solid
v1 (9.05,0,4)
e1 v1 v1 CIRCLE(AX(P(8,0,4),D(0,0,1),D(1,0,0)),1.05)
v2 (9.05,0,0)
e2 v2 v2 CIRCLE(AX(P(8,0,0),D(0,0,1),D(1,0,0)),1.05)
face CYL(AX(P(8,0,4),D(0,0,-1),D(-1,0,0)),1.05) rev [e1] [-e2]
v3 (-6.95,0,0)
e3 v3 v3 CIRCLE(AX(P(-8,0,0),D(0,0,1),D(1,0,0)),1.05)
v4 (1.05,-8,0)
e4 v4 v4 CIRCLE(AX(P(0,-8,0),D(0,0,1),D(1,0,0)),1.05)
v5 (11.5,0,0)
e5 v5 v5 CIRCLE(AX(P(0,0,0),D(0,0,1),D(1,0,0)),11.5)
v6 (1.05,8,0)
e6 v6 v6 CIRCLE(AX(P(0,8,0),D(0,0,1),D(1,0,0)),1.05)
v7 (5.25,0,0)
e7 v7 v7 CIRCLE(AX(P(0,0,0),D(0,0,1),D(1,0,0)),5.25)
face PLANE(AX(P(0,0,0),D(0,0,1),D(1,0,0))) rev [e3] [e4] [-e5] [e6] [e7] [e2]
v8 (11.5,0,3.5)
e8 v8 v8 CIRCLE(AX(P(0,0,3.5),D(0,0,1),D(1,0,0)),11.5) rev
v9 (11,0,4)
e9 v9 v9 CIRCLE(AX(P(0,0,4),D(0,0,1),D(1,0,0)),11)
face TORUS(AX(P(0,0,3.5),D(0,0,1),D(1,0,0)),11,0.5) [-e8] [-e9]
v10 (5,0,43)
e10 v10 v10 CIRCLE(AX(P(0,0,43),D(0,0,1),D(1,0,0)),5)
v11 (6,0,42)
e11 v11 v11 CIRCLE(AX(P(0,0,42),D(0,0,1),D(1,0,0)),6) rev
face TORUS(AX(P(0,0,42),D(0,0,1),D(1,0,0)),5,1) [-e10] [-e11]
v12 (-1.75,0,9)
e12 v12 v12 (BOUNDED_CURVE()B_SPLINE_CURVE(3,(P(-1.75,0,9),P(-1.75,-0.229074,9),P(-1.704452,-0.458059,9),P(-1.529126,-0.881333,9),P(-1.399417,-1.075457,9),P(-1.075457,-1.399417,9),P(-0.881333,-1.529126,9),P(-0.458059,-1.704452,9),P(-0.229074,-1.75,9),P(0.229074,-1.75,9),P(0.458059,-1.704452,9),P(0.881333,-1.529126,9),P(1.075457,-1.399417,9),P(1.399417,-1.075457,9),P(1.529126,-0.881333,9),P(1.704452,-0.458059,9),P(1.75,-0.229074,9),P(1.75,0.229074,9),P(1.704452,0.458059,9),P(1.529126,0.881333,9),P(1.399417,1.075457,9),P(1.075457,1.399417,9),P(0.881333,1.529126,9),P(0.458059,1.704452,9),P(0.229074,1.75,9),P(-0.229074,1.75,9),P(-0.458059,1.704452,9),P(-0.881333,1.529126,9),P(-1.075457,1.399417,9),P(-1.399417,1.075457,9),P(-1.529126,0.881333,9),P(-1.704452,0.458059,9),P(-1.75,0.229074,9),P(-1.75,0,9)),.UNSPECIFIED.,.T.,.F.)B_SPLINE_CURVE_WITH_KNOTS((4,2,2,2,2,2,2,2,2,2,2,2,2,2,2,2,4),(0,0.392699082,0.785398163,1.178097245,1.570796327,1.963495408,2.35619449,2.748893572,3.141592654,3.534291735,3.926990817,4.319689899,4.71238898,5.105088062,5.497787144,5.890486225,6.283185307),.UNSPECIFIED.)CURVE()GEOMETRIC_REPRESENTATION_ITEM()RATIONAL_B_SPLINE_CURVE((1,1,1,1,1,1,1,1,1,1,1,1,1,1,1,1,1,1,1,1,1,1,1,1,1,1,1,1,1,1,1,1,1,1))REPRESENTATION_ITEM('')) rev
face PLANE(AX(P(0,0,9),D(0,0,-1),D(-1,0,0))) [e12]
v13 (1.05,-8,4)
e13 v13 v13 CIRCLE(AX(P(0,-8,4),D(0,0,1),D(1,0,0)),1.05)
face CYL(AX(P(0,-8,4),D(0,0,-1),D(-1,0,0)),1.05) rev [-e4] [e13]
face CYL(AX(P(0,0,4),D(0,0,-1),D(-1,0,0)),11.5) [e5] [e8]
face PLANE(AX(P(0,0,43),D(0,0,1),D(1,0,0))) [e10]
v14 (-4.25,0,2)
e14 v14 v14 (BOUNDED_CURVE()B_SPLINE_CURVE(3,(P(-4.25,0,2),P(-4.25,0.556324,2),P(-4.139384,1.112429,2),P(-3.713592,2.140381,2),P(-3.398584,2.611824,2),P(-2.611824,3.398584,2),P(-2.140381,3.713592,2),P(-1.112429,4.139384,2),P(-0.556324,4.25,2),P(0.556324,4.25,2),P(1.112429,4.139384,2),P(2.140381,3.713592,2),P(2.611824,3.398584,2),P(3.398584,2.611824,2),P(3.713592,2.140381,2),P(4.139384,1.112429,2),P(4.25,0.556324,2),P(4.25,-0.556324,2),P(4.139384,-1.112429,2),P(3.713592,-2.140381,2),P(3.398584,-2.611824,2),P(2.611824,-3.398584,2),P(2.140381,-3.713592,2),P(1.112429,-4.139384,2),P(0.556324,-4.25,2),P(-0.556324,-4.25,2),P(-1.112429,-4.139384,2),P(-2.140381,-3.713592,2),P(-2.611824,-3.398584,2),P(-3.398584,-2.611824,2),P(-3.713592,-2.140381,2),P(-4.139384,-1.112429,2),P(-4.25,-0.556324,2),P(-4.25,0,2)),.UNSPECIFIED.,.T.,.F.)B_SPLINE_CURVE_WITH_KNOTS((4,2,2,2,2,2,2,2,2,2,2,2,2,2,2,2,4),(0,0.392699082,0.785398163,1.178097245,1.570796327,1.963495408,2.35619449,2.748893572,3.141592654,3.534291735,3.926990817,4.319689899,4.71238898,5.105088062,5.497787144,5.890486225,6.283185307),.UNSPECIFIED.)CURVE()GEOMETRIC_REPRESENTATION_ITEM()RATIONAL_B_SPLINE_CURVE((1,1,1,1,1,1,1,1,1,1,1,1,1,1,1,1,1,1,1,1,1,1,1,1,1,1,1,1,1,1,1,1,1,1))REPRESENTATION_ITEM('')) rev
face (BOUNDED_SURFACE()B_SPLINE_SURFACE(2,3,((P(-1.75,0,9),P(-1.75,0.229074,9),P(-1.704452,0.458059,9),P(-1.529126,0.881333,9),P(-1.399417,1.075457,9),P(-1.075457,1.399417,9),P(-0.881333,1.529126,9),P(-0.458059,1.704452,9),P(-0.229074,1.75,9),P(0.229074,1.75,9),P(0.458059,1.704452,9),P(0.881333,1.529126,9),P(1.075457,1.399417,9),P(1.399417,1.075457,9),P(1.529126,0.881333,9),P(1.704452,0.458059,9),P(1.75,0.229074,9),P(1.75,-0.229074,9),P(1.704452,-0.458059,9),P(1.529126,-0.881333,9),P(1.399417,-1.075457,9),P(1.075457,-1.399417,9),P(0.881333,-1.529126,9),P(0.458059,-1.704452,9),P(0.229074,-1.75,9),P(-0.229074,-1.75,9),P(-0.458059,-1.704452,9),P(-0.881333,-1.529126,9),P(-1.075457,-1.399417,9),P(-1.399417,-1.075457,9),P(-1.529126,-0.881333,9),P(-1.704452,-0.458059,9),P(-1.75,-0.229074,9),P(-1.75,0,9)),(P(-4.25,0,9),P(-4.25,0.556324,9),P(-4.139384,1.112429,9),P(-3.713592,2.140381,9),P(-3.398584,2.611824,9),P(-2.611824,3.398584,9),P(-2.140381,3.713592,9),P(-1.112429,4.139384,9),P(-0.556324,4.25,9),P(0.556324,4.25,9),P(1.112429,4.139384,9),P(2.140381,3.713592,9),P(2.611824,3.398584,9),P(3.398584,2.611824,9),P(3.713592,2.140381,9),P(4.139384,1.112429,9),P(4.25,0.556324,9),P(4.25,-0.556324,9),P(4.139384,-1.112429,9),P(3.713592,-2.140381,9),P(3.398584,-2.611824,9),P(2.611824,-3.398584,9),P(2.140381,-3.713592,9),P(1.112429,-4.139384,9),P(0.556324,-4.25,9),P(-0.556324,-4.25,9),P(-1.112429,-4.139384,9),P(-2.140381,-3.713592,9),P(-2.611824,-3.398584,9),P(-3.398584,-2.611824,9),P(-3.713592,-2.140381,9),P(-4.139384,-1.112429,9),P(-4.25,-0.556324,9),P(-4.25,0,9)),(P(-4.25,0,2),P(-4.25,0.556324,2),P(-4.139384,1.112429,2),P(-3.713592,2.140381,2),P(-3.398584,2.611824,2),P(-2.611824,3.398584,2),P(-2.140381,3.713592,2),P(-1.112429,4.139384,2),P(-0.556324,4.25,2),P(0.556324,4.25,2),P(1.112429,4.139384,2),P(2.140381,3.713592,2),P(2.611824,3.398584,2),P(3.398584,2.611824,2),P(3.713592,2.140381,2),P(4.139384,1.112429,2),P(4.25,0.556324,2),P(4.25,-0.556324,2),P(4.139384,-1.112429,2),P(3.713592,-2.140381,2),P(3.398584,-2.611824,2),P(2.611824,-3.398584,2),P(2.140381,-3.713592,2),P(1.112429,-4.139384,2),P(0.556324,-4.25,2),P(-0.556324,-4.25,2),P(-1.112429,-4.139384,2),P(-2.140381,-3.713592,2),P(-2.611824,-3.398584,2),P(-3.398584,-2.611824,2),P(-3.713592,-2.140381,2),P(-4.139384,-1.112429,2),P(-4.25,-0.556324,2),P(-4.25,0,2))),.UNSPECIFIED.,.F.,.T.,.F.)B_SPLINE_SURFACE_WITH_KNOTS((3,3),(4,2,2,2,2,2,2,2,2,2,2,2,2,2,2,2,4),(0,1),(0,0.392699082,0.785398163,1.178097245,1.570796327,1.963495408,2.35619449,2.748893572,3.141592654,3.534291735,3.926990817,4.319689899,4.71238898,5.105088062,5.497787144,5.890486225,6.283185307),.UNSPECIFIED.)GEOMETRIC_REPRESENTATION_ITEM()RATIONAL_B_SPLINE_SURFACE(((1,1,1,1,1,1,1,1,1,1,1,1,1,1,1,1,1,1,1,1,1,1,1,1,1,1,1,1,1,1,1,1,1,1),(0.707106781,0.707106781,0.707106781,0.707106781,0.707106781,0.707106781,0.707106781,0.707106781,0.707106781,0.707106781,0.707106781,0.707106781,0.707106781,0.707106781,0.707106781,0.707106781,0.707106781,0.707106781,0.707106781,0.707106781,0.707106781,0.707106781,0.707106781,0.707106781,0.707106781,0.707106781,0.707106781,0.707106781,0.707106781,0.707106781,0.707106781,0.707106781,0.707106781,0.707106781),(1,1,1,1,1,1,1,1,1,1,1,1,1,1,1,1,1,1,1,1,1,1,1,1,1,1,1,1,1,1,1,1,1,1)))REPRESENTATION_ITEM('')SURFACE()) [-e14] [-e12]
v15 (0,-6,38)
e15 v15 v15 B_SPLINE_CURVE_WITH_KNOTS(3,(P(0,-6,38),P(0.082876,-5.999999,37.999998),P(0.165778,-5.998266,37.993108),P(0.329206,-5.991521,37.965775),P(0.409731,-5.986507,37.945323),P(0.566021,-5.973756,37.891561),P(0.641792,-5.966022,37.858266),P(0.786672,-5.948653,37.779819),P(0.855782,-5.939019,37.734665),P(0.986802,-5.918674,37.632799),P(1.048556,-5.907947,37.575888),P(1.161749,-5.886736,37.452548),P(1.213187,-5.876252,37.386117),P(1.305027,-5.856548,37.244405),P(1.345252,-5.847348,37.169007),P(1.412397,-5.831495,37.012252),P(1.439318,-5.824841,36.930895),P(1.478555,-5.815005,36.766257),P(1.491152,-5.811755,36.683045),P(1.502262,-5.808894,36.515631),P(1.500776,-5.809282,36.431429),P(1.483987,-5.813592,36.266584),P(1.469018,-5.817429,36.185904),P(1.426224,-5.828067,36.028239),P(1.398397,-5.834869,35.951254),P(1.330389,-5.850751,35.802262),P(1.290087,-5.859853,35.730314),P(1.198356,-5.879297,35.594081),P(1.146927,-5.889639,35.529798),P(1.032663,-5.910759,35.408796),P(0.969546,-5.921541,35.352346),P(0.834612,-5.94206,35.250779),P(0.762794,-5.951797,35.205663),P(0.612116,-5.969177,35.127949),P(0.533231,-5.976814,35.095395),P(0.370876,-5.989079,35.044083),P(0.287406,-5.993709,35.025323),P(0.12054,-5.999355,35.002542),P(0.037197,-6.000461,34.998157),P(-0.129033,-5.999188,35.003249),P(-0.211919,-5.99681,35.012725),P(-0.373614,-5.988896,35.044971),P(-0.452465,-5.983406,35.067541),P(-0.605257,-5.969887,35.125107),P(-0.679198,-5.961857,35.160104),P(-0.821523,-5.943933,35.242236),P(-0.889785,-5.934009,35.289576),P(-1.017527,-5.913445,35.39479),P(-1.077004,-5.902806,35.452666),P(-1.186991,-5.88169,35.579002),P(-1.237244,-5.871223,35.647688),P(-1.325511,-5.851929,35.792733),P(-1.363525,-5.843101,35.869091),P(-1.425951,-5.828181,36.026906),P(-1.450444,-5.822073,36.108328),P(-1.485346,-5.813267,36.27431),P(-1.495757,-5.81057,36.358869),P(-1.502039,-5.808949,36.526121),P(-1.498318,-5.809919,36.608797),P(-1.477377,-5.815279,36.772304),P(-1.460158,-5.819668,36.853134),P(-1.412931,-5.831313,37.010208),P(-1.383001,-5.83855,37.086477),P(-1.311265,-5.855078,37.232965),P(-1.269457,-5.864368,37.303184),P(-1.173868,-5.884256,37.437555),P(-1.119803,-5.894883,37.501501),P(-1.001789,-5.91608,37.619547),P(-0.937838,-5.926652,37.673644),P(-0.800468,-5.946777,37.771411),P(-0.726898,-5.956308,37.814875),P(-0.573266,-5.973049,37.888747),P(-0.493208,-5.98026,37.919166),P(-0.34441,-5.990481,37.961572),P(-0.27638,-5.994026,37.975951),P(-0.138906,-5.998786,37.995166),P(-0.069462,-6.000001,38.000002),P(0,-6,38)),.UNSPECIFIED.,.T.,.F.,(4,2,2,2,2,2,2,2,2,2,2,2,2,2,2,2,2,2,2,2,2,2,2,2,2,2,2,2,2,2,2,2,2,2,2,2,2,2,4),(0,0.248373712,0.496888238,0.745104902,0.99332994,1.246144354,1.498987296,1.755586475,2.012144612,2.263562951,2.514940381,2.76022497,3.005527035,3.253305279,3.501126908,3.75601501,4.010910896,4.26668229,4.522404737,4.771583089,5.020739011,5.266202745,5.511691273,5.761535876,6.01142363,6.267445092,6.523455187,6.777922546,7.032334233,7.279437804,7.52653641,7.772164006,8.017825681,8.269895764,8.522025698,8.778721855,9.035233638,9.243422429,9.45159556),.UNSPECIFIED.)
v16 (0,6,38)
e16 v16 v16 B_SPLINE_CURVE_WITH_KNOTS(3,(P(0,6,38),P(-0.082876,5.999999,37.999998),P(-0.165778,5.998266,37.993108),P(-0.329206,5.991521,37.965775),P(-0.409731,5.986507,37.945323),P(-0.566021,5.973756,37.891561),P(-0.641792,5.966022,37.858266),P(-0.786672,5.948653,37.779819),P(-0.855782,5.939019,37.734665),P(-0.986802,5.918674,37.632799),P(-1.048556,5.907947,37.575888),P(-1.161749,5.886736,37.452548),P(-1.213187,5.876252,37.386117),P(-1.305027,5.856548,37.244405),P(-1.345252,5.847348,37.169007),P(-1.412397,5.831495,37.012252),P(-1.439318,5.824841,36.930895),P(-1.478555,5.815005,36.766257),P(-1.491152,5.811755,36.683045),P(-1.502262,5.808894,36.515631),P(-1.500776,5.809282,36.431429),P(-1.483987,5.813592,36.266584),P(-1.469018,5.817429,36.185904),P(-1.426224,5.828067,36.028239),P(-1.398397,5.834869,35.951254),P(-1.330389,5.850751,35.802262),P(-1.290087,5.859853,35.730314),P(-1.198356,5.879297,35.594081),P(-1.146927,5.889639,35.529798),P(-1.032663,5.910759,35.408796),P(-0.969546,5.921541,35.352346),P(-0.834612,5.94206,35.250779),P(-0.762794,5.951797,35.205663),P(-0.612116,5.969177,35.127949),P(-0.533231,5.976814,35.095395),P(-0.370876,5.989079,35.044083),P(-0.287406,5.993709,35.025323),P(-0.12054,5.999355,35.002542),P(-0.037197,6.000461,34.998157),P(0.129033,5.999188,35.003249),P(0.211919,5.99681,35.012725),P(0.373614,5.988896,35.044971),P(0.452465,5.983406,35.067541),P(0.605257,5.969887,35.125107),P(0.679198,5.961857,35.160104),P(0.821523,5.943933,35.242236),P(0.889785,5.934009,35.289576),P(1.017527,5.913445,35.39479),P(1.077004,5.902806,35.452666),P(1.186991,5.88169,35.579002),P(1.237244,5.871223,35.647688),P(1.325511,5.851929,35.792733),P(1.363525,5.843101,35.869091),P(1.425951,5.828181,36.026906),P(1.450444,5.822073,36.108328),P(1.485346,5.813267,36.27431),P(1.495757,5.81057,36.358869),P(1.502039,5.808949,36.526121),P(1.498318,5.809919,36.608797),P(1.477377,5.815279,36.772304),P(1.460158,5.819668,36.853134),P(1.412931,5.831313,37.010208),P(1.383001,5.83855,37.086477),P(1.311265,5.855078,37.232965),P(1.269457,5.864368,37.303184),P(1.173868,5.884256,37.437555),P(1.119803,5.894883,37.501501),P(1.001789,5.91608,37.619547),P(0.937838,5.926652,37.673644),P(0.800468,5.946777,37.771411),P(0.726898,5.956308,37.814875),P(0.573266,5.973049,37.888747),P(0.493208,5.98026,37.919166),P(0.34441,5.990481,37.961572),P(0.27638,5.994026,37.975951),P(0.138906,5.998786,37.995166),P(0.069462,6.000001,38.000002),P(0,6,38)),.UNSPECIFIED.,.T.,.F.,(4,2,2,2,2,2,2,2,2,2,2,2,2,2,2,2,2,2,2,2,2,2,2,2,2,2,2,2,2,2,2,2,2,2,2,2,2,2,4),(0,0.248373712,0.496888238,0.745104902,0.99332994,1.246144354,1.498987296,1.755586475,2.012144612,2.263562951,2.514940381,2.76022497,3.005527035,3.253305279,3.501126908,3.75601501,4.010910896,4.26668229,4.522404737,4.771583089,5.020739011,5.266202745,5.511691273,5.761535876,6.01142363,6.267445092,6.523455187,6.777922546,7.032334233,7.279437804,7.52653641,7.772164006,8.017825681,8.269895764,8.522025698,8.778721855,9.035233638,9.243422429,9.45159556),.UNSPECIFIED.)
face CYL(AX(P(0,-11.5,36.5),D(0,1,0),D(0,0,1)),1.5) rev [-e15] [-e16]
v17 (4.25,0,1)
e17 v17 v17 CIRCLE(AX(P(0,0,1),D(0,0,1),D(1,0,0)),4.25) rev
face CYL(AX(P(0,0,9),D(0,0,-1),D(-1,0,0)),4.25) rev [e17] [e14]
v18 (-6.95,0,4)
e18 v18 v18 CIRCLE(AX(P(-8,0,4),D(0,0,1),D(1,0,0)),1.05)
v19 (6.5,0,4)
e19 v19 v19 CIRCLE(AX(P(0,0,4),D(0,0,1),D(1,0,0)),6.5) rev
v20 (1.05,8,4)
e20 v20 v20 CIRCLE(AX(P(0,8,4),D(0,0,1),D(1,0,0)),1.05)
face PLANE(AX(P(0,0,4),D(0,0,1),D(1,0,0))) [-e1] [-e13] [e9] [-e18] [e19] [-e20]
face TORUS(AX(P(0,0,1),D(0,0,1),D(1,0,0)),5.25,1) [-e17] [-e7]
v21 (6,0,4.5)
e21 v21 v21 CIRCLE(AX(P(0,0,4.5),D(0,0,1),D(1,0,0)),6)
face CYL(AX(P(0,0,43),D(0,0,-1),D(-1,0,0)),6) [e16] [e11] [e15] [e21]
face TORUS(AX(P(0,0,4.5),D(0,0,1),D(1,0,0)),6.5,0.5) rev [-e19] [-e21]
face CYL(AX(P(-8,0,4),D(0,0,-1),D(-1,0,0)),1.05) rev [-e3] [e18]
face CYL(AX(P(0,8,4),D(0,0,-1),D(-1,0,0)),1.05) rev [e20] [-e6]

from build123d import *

# Parameters (mm, degrees)
SKETCH1_R               = 11.5
SKETCH1_R_2             = 1.05
BOSS_EXTRUDE1_DEPTH     = 4
SKETCH2_R               = 6
BOSS_EXTRUDE2_DEPTH     = 39
SKETCH3_R               = 4.25
CUT_EXTRUDE1_DEPTH      = 9
FILLET1_R               = 0.5
FILLET2_R               = 1
FILLET4_R               = 1
FILLET5_SIZE            = 7
FILLET5_SIZE_2          = 2.5
CUT_EXTRUDE2_DEPTH      = 46.972818106
CUT_EXTRUDE2_DEPTH_BACK = 46.972818106
SKETCH5_R               = 1.5


with BuildPart() as part:
    # Sketch1 → Boss-Extrude1 (new body)
    with BuildSketch(Plane.XY):
        Circle(SKETCH1_R)
        with Locations((-8, 0)):
            Circle(SKETCH1_R_2, mode=Mode.SUBTRACT)
        with Locations((0, -8)):
            Circle(SKETCH1_R_2, mode=Mode.SUBTRACT)
        with Locations((8, 0)):
            Circle(SKETCH1_R_2, mode=Mode.SUBTRACT)
        with Locations((0, 8)):
            Circle(SKETCH1_R_2, mode=Mode.SUBTRACT)
    extrude(amount=BOSS_EXTRUDE1_DEPTH)

    # Sketch2 → Boss-Extrude2 (add)
    with BuildSketch(Plane.XY.offset(4)):
        Circle(SKETCH2_R)
    extrude(amount=BOSS_EXTRUDE2_DEPTH)

    # Sketch3 → Cut-Extrude1 (cut)
    with BuildSketch(Plane(origin=(0, 0, 0), x_dir=(-1, 0, 0), z_dir=(0, 0, -1))):
        Circle(SKETCH3_R)
    extrude(amount=-CUT_EXTRUDE1_DEPTH, mode=Mode.SUBTRACT)

    # Fillet1
    fillet1_edges = [part.edges().sort_by_distance(p)[0] for p in [
        (-6, 0, 4),
        (-11.5, 0, 4),
    ]]
    fillet(fillet1_edges, radius=FILLET1_R)

    # Fillet2
    fillet2_edges = [part.edges().sort_by_distance(p)[0] for p in [
        (-6, 0, 43),
    ]]
    fillet(fillet2_edges, radius=FILLET2_R)

    # Fillet4
    fillet4_edges = [part.edges().sort_by_distance(p)[0] for p in [
        (4.25, 0, 0),
    ]]
    fillet(fillet4_edges, radius=FILLET4_R)

    # Fillet5
    # an asymmetric fillet: 7, 2.5 mm, written as the material it adds along each edge
    with BuildSketch(Plane(origin=(0, 0, 9), x_dir=(-1, 0, 0), z_dir=(0, -1, 0))) as fillet5_piece_1:
        with BuildLine():
            Bezier((4.25, FILLET5_SIZE), (4.25, 0), (4.25 - FILLET5_SIZE_2, 0), weights=[1, 0.707106781, 1])
            Line((4.25 - FILLET5_SIZE_2, 0), (4.25, 0))
            Line((4.25, 0), (4.25, FILLET5_SIZE))
        make_face()
    revolve(axis=Axis((0, 0, 9), (0, 0, -1)))

    # Sketch5 → Cut-Extrude2 (cut, two sides: drawn at the far end of the back side and taken through both)
    with BuildSketch(Plane(origin=(0, 0, 0), x_dir=(1, 0, 0), z_dir=(0, 1, 0)).offset(-CUT_EXTRUDE2_DEPTH_BACK)):
        with Locations(Location((0, -36.5, 0), (0, 0, 270))):
            Circle(SKETCH5_R)
    extrude(amount=CUT_EXTRUDE2_DEPTH + CUT_EXTRUDE2_DEPTH_BACK, mode=Mode.SUBTRACT)


solid = part.part
